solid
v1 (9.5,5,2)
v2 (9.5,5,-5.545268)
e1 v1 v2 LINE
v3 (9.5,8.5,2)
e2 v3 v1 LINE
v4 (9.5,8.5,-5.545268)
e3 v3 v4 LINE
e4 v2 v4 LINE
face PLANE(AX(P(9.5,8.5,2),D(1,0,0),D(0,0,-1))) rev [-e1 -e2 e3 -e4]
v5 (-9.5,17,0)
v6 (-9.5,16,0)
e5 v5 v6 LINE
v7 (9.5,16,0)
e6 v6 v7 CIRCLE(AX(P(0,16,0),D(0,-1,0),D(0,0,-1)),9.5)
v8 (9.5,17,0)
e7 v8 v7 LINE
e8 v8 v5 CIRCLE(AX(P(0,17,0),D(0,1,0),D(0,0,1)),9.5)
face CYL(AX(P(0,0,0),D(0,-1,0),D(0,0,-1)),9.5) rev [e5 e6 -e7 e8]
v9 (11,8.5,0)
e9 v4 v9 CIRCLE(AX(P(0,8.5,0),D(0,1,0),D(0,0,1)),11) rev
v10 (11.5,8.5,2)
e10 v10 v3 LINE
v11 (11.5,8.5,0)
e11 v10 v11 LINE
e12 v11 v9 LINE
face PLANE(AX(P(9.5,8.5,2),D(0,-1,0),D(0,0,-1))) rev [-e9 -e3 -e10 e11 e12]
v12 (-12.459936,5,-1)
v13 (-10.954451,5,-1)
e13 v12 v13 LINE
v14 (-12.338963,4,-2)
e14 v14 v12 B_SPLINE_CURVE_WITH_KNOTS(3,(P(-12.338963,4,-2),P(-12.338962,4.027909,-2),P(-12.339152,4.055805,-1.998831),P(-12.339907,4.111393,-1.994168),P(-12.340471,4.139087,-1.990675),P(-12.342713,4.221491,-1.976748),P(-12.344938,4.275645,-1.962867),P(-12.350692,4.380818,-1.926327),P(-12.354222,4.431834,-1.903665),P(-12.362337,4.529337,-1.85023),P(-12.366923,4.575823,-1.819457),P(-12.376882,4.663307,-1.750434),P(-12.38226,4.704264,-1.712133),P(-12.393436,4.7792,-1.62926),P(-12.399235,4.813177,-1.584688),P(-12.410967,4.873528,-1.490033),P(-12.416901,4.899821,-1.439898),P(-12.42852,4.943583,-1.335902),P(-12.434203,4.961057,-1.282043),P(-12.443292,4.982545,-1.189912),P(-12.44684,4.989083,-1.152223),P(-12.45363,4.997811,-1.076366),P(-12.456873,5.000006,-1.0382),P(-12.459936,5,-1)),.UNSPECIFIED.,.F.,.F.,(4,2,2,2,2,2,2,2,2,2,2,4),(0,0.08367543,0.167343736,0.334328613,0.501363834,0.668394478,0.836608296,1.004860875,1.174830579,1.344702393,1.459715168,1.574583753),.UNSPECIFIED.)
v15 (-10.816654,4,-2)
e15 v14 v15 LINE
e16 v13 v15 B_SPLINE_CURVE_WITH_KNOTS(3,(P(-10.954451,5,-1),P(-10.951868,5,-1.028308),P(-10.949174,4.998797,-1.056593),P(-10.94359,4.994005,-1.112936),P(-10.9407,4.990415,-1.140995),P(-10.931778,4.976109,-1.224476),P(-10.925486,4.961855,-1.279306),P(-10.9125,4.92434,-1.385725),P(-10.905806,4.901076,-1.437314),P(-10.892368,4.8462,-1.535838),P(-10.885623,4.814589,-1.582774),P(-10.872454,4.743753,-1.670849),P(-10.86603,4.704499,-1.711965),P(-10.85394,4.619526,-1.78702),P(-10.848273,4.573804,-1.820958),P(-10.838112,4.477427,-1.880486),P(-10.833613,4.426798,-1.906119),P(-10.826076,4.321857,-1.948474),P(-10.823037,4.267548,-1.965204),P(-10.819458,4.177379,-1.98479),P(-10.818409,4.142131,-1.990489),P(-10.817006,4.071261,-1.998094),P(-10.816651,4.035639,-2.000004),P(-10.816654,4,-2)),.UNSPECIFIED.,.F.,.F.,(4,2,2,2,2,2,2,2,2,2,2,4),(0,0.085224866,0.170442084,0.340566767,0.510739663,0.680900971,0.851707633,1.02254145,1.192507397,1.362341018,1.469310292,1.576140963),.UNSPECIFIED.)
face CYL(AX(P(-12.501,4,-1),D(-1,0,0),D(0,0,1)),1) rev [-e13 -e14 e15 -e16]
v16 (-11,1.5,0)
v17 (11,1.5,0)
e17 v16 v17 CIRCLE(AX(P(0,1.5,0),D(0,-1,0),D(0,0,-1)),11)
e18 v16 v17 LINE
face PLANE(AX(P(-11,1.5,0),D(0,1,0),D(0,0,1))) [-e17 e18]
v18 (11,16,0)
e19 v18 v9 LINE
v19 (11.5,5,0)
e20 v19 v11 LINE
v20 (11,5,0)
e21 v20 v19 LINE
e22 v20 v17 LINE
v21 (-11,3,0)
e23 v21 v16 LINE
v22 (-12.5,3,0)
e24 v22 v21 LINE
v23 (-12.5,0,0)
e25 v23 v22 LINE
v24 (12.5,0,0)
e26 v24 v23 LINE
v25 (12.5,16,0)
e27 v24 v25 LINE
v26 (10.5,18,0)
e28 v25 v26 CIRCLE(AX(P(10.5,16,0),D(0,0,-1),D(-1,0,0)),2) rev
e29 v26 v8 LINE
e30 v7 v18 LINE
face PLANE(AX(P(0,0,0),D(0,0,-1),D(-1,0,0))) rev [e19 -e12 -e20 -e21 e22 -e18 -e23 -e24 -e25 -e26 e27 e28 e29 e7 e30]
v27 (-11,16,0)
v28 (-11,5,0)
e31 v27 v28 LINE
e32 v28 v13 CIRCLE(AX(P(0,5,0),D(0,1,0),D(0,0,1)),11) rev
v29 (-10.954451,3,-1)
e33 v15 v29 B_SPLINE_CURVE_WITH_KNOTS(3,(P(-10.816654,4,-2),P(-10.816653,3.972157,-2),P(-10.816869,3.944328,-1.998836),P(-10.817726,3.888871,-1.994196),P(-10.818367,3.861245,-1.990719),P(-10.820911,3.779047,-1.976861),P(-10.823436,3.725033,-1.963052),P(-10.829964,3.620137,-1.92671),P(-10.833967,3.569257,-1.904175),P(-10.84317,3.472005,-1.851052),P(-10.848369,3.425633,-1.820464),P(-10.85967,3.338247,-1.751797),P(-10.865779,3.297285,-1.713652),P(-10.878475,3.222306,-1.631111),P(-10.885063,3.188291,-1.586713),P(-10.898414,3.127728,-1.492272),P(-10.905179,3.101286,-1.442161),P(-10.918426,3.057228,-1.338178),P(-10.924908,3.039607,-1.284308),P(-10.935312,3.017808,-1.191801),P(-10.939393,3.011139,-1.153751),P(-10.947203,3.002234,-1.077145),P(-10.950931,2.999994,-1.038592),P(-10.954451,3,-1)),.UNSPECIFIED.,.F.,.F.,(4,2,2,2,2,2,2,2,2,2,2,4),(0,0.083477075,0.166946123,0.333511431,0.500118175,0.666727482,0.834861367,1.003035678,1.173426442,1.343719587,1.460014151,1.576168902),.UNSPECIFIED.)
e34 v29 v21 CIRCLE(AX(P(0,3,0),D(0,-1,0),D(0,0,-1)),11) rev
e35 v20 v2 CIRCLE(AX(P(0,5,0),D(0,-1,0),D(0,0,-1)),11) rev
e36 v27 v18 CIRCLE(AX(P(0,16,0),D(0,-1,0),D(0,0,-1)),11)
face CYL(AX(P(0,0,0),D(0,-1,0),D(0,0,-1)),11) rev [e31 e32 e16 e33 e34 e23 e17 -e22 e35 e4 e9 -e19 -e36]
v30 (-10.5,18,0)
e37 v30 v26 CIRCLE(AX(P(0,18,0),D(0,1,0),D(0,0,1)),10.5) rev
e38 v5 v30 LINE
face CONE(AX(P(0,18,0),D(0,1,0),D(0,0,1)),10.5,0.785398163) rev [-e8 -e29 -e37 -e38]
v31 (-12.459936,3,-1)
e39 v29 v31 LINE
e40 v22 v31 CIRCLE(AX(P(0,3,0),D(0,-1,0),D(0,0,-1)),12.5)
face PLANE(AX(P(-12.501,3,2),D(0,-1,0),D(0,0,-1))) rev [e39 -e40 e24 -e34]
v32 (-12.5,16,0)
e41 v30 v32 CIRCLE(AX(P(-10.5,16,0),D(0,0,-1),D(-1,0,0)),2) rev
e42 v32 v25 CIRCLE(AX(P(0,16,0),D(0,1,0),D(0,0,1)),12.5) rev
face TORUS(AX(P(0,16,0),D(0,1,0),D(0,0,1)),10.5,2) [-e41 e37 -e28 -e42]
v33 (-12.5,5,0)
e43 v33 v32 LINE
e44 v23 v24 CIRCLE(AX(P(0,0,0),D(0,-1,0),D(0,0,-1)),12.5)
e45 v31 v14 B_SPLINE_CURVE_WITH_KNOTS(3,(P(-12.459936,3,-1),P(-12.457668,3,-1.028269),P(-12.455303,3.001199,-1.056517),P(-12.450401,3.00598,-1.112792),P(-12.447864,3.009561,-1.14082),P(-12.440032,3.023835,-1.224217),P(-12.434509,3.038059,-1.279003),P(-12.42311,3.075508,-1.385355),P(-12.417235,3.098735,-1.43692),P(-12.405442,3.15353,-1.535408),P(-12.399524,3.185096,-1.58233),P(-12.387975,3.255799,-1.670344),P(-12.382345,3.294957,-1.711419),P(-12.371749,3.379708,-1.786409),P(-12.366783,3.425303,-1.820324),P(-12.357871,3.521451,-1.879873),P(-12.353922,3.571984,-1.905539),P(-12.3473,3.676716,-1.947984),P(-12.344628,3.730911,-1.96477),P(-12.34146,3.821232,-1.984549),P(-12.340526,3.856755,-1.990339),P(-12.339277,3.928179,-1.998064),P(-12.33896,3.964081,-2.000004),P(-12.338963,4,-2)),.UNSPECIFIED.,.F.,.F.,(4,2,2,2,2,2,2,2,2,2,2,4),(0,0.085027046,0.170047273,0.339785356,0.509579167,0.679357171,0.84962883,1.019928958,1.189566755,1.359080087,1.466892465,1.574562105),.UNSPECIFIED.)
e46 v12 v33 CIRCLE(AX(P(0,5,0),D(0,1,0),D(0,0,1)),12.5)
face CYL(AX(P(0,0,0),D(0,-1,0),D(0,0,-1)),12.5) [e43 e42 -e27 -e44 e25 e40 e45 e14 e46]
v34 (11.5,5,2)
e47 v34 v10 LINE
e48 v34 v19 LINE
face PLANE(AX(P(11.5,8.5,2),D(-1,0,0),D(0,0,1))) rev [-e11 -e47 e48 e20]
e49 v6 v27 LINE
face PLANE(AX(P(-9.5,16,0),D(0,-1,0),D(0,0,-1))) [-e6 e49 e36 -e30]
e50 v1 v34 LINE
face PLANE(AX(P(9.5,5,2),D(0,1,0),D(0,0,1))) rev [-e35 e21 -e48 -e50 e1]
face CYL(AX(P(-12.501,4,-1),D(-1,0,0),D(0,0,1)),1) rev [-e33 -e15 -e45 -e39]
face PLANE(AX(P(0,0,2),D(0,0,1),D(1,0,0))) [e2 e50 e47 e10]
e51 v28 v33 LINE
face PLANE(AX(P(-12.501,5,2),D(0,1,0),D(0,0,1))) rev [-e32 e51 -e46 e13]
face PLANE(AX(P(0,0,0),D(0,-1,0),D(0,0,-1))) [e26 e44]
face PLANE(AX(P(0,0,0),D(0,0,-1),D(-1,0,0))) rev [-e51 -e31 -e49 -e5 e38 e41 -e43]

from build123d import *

# Parameters (mm, degrees)
R_VOLUTION1_ANGLE              = 180
CHANFREIN1_SIZE                = 1
CONG_1_R                       = 2
ENL_V_MAT_EXTRU_1_REACH        = 27.229
ESQUISSE4_W                    = 4
ESQUISSE4_H                    = 2
CONG_2_R                       = 1
BOSS_EXTRU_2_REACH             = 27.229
BOSS_EXTRU_2_END_RADIUS        = 11
ESQUISSE5_W                    = 2
ESQUISSE5_H                    = 3.5
BOSS_EXTRU_2_DIRECTION_2_DEPTH = 2


with BuildPart() as part:
    # Esquisse3 → Révolution1 (revolve)
    with BuildSketch(Plane.XY):
        Polygon((0, 0), (12.5, 0), (12.5, 18), (9.5, 18), (9.5, 16), (11, 16), (11, 1.5), (0, 1.5), align=None)
    revolve(axis=Axis((0, 0, 0), (0, 1, 0)), revolution_arc=R_VOLUTION1_ANGLE)

    # Chanfrein1
    chanfrein1_edges = [part.edges().sort_by_distance(p)[0] for p in [
        (0, 18, -9.5),
    ]]
    chamfer(chanfrein1_edges, length=CHANFREIN1_SIZE)

    # Congé1
    cong_1_edges = [part.edges().sort_by_distance(p)[0] for p in [
        (0, 18, -12.5),
    ]]
    fillet(cong_1_edges, radius=CONG_1_R - 0.0001)  # a hair under: the kernel refuses the full size

    # Esquisse4 → Enlèv. mat.-Extru.1 (cut, up to next)
    with BuildSketch(Plane(origin=(0, 0, 0), x_dir=(0, 0, -1), z_dir=(1, 0, 0)), mode=Mode.PRIVATE) as enl_v_mat_extru_1_sk1:
        with Locations((0, 4)):
            Rectangle(ESQUISSE4_W, ESQUISSE4_H)
    enl_v_mat_extru_1_tool1 = extrude(enl_v_mat_extru_1_sk1.sketch, amount=-ENL_V_MAT_EXTRU_1_REACH, mode=Mode.PRIVATE) & part.part
    add(enl_v_mat_extru_1_tool1.solids().sort_by_distance((0, 4, 0))[0], mode=Mode.SUBTRACT)

    # Congé2
    cong_2_edges = [part.edges().sort_by_distance(p)[0] for p in [
        (-11.577808253, 5, -2),
        (-11.577808253, 3, -2),
    ]]
    fillet(cong_2_edges, radius=CONG_2_R - 0.0001)  # a hair under: the kernel refuses the full size

    # Boss.-Extru.2: up to this cylinder (the profile starts inside it)
    boss_extru_2_end = Plane(origin=(0, 6.75, 0), z_dir=(0, -1, 0)) * Cylinder(BOSS_EXTRU_2_END_RADIUS, 77.458, mode=Mode.PRIVATE)
    # Esquisse5 → Boss.-Extru.2 (add, up to the surface)
    with BuildSketch(Plane.XY, mode=Mode.PRIVATE) as boss_extru_2_sk1:
        with Locations((10.5, 6.75)):
            Rectangle(ESQUISSE5_W, ESQUISSE5_H)
    boss_extru_2_tool1 = extrude(boss_extru_2_sk1.sketch, amount=-BOSS_EXTRU_2_REACH, mode=Mode.PRIVATE) & boss_extru_2_end
    add(boss_extru_2_tool1.solids().sort_by_distance((10.5, 6.75, 0))[0])

    # Esquisse5 → Boss.-Extru.2 direction 2 (add)
    with BuildSketch(Plane.XY):
        with Locations((10.5, 6.75)):
            Rectangle(ESQUISSE5_W, ESQUISSE5_H)
    extrude(amount=BOSS_EXTRU_2_DIRECTION_2_DEPTH)


solid = part.part
